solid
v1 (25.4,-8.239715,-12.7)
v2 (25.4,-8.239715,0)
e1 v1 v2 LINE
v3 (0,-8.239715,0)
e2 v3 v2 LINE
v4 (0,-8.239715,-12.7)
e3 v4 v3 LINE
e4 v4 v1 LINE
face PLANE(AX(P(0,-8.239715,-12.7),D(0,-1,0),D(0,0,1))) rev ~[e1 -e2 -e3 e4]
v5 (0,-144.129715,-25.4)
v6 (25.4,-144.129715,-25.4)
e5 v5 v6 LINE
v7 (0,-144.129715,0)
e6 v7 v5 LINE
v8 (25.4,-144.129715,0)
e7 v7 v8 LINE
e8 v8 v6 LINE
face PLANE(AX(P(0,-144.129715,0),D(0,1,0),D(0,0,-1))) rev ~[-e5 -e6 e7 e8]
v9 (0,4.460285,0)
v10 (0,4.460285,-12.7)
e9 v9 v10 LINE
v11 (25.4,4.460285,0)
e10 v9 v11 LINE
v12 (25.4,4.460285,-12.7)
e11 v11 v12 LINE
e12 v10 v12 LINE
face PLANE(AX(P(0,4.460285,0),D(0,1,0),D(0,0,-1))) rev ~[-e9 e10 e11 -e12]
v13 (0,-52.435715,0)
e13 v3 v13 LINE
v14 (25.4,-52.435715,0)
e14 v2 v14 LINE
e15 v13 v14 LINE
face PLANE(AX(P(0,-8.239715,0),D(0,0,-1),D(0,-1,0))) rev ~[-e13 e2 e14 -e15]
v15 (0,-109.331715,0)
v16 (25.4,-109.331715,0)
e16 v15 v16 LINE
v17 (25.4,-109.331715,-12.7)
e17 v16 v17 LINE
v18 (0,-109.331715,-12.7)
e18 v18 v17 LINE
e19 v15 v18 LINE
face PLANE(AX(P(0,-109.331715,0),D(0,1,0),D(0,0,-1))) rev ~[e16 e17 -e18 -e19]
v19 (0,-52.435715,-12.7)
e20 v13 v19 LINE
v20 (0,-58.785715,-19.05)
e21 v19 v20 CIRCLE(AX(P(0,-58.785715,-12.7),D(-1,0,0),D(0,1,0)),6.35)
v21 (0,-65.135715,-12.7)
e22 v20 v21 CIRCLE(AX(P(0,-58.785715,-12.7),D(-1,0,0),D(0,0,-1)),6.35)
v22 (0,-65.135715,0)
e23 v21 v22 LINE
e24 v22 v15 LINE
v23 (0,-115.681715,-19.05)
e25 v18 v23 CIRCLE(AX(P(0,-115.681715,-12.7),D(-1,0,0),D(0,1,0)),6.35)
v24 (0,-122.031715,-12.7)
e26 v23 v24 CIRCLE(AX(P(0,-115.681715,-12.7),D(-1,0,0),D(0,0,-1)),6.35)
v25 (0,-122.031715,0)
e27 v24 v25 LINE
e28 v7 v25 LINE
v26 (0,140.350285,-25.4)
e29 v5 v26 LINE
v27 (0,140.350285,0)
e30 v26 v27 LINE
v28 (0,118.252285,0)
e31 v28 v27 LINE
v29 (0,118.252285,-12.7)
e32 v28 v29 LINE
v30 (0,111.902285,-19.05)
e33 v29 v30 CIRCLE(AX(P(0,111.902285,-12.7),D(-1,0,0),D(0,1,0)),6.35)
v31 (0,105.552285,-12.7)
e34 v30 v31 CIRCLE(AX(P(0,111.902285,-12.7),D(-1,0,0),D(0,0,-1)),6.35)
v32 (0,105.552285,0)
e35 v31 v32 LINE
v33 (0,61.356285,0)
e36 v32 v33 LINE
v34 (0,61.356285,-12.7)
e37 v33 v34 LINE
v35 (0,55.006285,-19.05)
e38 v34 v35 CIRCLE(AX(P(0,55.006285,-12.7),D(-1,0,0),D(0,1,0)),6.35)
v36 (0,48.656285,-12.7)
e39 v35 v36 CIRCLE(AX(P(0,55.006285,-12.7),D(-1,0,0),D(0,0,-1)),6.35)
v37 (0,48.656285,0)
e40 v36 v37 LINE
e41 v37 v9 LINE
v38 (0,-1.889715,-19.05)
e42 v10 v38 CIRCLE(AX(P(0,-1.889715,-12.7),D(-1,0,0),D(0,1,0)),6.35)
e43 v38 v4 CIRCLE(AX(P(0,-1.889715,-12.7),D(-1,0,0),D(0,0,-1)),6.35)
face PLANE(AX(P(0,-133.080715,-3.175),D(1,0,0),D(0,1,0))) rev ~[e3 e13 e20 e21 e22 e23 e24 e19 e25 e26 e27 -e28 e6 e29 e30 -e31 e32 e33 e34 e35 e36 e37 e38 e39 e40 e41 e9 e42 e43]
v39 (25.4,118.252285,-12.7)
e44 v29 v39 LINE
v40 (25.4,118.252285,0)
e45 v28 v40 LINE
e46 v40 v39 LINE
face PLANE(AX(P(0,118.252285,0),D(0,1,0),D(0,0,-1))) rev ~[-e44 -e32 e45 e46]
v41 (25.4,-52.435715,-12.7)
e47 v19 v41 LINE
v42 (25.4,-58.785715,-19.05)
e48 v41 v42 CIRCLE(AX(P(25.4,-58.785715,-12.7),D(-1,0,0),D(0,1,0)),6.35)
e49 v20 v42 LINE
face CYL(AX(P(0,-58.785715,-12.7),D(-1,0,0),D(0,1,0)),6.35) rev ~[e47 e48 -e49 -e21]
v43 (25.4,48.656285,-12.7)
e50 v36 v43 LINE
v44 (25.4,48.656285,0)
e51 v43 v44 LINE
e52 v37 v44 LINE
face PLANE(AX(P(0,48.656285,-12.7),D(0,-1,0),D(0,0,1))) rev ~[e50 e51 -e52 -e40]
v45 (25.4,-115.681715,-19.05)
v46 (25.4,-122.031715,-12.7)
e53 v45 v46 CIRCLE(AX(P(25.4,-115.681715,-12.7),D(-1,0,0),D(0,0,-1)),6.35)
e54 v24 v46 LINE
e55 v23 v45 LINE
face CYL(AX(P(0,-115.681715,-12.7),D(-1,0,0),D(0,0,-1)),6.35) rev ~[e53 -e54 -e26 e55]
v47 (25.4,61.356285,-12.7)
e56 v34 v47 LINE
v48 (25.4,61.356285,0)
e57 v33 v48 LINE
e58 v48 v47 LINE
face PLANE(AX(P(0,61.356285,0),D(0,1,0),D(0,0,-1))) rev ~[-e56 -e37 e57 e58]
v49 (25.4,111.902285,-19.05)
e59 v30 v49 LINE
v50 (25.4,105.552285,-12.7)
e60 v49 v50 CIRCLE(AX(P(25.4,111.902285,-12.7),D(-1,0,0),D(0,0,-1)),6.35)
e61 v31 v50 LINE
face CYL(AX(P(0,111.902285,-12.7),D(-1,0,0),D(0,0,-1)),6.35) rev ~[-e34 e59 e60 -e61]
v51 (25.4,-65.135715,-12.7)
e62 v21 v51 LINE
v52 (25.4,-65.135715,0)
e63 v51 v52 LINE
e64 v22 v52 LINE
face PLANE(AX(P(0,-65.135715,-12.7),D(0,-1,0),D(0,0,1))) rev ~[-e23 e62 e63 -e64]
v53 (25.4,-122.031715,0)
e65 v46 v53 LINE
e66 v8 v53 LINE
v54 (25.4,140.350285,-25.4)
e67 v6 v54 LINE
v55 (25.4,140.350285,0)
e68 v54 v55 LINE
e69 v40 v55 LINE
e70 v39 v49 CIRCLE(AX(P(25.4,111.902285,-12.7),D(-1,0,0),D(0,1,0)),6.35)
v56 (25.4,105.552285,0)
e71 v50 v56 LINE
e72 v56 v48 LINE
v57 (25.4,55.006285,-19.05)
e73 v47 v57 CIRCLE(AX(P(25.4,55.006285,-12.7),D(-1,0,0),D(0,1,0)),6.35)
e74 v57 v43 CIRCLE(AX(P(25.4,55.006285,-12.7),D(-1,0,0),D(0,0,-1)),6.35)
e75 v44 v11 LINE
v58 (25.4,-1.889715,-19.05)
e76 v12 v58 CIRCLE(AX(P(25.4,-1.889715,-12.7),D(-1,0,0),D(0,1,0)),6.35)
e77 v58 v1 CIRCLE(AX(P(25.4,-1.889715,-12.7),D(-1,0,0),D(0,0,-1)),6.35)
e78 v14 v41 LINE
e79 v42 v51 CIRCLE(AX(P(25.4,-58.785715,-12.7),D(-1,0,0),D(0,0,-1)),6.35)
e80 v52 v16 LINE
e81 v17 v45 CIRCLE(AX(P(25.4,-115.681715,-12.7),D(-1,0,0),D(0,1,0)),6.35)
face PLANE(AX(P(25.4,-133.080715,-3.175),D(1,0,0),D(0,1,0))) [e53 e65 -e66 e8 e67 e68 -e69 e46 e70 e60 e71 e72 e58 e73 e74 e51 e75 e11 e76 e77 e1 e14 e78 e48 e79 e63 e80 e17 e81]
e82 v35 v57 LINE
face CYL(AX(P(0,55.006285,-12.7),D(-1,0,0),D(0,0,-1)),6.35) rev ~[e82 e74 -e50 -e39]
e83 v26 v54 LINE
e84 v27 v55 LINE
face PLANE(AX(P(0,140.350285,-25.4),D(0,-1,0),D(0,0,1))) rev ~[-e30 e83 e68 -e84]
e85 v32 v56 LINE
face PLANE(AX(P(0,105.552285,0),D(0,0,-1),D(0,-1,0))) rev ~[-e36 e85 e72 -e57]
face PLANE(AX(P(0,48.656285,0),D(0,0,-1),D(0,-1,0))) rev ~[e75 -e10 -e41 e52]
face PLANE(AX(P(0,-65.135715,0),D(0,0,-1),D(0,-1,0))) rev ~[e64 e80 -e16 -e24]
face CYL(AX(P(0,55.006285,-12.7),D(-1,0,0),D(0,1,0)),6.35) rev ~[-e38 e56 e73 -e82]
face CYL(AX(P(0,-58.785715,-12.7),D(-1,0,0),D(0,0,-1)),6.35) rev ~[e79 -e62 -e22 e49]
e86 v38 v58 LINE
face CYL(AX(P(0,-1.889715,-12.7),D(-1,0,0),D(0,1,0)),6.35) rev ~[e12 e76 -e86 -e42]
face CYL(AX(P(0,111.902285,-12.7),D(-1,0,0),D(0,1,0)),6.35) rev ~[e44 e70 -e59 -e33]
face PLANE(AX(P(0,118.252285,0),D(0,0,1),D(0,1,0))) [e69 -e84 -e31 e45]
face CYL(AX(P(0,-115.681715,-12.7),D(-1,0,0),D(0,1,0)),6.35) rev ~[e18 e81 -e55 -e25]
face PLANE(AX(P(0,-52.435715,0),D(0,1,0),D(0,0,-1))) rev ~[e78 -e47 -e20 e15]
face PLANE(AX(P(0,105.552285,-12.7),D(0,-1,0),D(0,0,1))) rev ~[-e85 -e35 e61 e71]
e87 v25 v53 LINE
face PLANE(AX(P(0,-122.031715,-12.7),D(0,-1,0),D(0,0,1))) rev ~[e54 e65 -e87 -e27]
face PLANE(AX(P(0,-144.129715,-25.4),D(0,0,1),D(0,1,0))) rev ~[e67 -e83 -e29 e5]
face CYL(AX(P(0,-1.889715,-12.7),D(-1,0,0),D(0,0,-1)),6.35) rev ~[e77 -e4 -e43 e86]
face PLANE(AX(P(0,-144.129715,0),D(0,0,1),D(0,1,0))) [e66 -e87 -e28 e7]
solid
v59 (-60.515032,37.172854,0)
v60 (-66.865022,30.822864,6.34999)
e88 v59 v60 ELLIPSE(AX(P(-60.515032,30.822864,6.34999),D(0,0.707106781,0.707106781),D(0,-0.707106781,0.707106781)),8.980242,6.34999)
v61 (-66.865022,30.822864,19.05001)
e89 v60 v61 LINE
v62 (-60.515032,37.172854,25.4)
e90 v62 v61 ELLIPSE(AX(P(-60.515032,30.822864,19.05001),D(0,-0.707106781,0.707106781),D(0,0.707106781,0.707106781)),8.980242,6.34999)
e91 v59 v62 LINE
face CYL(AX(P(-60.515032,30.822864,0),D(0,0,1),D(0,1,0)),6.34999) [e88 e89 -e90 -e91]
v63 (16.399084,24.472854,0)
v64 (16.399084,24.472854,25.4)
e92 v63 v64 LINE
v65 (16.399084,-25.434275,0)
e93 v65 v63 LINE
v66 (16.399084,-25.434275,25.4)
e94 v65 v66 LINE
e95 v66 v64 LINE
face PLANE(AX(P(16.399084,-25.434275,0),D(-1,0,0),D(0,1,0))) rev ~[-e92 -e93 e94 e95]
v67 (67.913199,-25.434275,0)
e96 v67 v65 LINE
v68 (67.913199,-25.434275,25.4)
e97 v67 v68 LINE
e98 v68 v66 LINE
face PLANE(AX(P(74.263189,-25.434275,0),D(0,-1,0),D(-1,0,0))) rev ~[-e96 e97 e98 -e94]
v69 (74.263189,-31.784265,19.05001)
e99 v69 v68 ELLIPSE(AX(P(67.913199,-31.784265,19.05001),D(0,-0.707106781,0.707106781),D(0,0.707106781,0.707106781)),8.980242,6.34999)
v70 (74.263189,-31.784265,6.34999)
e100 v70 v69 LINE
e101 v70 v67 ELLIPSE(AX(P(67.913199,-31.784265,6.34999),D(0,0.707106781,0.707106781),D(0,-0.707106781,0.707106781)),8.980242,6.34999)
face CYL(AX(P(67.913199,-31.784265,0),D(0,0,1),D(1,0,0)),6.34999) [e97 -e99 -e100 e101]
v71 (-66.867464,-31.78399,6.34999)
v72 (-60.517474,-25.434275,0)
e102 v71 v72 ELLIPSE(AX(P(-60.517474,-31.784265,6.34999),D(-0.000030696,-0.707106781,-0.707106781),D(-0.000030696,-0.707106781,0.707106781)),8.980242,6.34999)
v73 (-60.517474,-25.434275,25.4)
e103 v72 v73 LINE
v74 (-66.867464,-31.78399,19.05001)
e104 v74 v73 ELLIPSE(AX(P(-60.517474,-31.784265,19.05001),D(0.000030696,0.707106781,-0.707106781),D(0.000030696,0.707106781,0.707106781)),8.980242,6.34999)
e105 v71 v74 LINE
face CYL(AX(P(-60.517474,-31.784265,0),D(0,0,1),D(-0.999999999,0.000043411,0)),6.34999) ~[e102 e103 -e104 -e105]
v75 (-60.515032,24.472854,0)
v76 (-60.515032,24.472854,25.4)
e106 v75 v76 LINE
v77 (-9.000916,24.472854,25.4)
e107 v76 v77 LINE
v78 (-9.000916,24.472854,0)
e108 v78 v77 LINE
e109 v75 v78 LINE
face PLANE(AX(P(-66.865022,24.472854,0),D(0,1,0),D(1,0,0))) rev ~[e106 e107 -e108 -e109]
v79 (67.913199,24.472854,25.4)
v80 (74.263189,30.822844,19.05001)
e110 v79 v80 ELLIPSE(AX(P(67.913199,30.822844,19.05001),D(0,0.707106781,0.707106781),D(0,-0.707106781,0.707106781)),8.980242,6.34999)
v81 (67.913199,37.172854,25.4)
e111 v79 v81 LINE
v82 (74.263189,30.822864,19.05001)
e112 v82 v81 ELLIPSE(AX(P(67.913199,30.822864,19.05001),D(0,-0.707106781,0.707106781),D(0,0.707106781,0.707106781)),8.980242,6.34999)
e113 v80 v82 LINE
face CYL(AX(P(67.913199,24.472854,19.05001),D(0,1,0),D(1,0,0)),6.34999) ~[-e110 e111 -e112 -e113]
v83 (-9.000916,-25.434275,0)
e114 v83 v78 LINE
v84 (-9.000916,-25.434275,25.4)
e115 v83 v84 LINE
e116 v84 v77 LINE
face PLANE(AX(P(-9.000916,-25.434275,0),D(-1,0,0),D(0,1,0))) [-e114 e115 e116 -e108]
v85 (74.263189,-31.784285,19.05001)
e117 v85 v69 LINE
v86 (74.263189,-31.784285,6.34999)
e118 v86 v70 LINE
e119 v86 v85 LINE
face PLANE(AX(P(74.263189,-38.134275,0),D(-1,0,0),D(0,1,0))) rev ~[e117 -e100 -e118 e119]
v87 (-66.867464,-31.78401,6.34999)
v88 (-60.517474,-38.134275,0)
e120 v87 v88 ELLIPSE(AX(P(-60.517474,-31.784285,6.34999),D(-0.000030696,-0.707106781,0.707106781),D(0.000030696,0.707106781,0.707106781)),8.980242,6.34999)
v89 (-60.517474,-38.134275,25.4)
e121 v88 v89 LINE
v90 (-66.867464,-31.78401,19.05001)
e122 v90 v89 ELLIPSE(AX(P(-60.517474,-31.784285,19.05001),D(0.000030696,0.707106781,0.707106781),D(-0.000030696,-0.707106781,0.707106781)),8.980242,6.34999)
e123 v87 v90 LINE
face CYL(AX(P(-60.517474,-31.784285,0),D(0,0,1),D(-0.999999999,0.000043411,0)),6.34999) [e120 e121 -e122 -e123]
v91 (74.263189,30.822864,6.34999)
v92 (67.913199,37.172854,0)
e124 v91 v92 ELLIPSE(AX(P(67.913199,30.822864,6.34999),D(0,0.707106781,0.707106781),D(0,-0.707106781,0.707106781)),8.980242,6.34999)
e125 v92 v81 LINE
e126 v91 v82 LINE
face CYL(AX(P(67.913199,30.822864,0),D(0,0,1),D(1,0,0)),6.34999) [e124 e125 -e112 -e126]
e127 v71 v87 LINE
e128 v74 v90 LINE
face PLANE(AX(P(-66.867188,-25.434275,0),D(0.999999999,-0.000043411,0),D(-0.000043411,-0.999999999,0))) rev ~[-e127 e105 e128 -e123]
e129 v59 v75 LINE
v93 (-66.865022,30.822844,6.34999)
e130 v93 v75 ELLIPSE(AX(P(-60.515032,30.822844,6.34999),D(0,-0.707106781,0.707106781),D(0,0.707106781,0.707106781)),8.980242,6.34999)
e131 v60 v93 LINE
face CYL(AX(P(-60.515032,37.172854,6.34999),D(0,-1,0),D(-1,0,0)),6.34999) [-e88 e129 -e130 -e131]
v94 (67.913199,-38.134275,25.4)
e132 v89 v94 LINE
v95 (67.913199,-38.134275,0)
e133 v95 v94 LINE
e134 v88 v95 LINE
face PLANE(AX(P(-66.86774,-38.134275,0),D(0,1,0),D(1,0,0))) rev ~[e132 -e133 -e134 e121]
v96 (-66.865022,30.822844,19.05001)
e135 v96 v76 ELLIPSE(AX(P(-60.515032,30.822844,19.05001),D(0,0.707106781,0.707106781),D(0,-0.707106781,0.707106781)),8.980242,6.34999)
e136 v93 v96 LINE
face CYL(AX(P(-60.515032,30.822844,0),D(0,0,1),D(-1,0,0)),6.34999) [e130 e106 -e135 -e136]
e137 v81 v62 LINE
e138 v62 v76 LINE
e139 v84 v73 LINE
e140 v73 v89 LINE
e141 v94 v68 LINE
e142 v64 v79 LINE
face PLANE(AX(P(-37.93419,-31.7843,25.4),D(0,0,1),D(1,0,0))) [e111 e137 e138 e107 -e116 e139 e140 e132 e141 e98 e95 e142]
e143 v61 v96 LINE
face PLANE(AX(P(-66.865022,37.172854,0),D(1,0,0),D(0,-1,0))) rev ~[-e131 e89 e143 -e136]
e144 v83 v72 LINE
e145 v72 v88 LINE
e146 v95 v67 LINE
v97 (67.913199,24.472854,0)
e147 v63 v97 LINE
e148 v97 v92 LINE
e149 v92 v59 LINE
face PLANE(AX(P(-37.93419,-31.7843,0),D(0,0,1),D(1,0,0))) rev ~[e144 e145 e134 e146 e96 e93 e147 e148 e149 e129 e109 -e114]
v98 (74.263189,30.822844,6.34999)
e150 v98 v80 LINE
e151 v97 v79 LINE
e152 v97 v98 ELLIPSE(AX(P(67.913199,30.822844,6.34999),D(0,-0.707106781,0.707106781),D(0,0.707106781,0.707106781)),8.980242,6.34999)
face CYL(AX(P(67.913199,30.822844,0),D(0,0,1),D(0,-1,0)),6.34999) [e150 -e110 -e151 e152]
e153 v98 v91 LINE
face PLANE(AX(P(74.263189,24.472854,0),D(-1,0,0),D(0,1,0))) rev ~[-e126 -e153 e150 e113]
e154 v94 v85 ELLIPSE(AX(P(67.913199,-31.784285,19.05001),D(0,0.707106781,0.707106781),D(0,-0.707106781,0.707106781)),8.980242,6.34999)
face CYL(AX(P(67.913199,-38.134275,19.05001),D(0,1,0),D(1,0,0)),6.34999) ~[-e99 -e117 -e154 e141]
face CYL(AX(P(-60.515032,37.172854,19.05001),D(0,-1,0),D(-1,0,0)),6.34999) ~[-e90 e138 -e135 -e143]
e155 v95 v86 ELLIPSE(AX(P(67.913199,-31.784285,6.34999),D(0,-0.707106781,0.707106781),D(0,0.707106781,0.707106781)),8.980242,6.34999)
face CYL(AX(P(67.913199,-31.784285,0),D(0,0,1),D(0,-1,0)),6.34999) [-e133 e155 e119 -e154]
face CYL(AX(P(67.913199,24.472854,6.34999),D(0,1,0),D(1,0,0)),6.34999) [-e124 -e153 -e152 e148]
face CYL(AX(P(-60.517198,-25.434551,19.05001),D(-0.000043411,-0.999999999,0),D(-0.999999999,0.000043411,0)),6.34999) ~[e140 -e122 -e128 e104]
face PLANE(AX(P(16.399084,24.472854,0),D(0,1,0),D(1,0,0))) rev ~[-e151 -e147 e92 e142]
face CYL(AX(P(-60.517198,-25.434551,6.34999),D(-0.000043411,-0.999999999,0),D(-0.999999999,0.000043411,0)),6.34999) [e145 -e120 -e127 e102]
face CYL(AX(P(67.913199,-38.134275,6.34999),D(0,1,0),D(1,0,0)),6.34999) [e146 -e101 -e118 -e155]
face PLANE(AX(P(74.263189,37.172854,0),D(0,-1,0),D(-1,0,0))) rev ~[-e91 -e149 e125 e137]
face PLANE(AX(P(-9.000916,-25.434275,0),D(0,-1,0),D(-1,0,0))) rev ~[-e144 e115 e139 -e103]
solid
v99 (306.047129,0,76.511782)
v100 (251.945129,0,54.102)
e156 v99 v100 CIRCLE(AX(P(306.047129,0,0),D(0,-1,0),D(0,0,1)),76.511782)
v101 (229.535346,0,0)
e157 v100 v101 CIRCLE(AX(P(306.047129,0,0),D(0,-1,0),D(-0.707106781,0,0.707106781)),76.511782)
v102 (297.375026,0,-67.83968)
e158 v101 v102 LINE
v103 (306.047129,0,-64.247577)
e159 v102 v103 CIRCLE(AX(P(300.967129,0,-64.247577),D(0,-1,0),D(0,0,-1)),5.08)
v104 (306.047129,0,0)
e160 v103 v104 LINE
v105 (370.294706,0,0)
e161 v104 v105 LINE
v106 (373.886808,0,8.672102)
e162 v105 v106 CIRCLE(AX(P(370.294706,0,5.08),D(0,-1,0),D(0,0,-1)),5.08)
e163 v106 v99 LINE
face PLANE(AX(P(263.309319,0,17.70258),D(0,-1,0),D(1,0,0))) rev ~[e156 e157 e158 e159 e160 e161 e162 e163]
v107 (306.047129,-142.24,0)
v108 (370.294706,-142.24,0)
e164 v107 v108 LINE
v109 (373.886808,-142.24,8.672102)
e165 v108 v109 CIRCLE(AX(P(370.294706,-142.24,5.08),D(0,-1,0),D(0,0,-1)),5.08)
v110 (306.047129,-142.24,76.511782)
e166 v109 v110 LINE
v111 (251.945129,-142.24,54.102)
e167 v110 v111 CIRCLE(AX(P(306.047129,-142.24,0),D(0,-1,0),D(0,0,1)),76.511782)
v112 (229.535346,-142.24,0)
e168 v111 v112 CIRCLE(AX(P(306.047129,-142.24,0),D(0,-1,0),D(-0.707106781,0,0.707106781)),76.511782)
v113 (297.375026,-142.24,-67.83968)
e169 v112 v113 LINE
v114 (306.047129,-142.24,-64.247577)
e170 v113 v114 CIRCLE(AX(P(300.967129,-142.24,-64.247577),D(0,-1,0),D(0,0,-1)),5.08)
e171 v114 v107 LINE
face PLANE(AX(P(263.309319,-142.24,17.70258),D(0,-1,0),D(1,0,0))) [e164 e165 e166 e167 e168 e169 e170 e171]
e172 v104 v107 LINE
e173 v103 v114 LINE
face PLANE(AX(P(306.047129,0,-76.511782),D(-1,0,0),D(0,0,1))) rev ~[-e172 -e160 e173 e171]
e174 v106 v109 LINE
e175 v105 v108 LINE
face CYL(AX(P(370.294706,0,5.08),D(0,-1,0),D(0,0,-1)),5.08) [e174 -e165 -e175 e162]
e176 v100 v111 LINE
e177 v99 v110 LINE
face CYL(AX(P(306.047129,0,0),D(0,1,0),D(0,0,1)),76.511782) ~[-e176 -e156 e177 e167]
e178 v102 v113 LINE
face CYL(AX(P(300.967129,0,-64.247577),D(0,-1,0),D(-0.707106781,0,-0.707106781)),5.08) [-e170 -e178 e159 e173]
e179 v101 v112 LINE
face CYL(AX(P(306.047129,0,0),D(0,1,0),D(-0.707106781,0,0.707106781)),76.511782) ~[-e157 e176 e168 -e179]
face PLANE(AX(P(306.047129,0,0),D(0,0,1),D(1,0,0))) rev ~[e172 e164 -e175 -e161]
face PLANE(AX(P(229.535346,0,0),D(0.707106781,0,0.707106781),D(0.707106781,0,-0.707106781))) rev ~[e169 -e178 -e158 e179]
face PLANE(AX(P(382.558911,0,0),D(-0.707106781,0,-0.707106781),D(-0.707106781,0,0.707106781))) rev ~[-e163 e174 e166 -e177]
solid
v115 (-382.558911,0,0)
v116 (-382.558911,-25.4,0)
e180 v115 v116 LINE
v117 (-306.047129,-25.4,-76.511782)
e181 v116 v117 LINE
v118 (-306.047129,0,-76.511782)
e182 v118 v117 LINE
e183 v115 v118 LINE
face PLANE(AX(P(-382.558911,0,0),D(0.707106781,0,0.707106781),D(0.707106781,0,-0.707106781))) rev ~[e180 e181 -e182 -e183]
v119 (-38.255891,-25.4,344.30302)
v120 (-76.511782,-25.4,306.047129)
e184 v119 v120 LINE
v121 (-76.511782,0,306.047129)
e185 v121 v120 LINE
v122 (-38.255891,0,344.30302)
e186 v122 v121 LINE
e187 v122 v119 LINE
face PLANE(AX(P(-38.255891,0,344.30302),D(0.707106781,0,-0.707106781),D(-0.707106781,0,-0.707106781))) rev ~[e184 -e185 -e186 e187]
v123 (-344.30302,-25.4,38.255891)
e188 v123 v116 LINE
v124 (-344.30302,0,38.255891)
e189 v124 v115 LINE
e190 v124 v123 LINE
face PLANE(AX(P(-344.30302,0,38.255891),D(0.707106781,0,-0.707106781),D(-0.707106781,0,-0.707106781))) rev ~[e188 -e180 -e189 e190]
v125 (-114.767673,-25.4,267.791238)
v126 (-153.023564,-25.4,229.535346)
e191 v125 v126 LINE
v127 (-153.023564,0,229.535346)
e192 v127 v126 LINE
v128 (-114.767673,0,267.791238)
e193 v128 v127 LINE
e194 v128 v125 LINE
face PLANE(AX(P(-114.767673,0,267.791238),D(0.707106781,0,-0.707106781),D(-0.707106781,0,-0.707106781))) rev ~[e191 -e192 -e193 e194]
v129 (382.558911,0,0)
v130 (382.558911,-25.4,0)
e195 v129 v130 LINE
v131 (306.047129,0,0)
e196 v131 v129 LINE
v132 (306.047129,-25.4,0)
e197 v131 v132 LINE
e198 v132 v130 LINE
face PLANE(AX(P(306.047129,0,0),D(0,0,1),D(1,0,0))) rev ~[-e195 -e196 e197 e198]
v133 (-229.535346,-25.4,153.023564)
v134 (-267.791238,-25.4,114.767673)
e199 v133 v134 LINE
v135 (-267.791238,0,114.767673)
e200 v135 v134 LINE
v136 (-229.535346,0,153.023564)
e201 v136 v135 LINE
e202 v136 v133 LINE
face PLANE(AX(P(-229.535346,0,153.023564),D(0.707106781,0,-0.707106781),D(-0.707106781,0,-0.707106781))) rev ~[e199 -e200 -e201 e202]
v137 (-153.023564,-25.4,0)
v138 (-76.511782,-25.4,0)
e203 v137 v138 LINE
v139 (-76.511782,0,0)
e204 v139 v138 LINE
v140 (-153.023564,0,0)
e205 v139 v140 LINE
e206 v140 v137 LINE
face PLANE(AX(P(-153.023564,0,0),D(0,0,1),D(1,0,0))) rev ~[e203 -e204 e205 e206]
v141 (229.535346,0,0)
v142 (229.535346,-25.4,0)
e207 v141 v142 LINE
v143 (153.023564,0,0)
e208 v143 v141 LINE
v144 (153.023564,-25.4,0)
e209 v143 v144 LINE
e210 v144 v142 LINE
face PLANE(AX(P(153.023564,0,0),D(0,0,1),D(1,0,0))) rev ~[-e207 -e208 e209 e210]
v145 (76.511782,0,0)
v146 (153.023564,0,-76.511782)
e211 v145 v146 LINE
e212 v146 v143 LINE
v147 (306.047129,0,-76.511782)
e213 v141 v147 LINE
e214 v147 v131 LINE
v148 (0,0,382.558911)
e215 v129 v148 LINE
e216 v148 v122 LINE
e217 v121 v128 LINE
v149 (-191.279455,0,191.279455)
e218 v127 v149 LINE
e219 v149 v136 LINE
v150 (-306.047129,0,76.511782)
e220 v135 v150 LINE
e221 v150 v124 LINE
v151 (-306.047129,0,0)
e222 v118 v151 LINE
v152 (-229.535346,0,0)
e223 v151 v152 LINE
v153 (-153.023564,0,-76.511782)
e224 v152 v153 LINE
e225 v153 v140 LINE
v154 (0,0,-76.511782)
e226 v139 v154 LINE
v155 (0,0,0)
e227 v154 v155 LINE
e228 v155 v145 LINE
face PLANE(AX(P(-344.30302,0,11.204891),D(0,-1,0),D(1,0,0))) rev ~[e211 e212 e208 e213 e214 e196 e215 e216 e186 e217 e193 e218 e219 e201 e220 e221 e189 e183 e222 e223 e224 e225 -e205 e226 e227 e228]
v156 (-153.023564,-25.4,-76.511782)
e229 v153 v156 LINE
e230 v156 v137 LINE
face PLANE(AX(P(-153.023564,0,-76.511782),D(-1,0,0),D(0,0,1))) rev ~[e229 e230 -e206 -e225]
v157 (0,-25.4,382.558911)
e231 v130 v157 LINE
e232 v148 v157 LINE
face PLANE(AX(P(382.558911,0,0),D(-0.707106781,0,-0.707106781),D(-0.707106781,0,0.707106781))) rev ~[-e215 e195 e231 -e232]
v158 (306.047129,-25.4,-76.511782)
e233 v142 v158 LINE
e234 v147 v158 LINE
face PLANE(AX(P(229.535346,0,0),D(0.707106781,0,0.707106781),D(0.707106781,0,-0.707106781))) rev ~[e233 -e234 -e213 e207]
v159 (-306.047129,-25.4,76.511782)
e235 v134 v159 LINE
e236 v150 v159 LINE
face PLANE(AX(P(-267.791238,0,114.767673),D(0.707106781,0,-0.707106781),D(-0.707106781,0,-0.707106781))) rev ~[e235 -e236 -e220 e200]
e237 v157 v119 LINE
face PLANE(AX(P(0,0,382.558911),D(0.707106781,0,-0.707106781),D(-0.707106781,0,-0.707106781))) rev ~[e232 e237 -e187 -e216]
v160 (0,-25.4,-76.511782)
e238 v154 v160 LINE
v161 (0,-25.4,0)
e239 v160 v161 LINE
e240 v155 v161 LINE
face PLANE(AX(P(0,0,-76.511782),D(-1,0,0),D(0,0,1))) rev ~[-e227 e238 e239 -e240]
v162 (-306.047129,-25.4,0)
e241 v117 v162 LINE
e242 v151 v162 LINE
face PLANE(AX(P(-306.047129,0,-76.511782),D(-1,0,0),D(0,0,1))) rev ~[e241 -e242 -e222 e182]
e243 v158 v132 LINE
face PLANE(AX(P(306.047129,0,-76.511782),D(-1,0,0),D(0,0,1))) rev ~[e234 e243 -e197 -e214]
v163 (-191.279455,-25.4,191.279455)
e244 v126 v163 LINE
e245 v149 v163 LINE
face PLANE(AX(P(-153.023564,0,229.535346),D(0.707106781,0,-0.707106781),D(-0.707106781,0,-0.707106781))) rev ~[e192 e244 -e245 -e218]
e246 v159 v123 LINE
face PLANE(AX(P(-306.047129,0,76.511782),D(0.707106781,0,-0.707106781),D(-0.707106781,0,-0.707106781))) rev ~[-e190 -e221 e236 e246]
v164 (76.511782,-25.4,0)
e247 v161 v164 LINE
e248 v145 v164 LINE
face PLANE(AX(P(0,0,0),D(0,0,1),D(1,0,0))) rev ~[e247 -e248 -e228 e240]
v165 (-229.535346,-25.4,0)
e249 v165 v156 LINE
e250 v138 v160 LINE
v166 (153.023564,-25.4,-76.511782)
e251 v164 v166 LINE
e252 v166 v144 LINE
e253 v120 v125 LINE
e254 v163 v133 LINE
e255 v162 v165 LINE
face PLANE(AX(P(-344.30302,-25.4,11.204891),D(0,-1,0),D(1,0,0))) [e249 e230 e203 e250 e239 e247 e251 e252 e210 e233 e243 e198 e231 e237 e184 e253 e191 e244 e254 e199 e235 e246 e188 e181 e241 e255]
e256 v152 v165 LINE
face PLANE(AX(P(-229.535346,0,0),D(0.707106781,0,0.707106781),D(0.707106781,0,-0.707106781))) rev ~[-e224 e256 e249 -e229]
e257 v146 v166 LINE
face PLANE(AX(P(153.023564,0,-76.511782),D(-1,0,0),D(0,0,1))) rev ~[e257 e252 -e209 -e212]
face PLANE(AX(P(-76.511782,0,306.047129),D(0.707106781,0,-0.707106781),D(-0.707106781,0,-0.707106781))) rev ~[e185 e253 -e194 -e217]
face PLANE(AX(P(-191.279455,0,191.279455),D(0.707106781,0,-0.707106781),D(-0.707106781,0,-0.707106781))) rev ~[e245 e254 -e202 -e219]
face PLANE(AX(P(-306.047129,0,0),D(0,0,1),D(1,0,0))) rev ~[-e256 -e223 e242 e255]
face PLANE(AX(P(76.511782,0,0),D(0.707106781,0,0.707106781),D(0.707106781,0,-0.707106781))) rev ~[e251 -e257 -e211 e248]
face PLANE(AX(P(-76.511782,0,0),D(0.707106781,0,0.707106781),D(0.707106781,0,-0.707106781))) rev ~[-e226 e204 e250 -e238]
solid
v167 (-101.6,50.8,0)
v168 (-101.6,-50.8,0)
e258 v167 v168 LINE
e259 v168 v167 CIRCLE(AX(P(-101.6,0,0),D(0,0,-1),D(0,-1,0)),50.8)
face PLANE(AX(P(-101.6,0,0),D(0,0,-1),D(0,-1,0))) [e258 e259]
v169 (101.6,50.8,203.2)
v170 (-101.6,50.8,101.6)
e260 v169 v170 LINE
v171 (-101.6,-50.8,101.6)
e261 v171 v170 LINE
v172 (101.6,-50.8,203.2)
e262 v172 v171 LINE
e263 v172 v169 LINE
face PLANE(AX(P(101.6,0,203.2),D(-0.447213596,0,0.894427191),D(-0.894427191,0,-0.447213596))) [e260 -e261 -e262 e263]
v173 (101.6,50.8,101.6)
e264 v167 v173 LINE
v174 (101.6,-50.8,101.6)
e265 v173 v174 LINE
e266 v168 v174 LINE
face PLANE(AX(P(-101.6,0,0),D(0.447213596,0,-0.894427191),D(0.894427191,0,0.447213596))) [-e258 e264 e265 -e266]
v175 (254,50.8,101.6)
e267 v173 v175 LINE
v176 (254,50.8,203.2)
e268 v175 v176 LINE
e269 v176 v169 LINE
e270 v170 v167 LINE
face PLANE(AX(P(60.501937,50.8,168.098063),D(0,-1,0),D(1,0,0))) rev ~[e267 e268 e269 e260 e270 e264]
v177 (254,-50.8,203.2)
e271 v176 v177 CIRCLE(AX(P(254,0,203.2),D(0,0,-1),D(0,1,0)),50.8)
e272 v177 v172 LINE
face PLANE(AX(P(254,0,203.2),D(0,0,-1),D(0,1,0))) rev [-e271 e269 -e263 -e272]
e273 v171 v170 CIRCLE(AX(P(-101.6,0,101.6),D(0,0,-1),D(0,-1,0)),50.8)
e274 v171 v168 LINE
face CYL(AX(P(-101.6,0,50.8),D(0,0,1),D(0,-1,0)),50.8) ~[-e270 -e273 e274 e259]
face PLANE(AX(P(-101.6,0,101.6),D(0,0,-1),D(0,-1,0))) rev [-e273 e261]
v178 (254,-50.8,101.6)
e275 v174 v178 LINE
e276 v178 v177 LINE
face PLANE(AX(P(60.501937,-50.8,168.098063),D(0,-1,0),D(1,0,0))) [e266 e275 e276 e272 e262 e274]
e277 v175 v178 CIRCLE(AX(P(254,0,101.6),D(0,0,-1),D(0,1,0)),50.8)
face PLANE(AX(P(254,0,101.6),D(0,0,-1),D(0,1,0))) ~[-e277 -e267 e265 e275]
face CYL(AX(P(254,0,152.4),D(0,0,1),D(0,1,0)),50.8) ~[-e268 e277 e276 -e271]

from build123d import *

# Parameters (mm, degrees)
F0_W          = 101.6
F0_H          = 50.8
F0_W_2        = 50.8
F0_H_2        = 101.6
F1_DEPTH      = 50.8
F2_ANGLE_BACK = 90
F2_ANGLE      = 180
F3_DEPTH      = 2.286
F0_W_3        = 43.6525400519
F4_ANGLE_BACK = 90
F4_ANGLE      = 180
F5_W          = 22.098
F5_H          = 6.35
F6_DEPTH      = 25.4
F7_W          = 57.8641055384
F7_H          = 12.7
F7_W_2        = 12.7
F7_H_2        = 49.9071290871
F8_DEPTH      = 25.4
F9_R          = 6.34999
F11_DEPTH     = 25.4
F12_DEPTH     = 142.24
F13_R         = 5.08


# Not quite as in the source:
# - a fillet or chamfer is up to 0.001 mm smaller than in the source, because OpenCascade refuses the exact size


with BuildPart() as f1:
    # F0 (on Front) → F1 (new body, symmetric)
    with BuildSketch(Plane.XZ):
        Polygon((101.6, 203.2), (0, 152.4), (101.6, 152.4), align=None)
        with Locations((50.8, 127)):
            Rectangle(F0_W, F0_H)
        Polygon((0, 152.4), (-101.6, 101.6), (0, 101.6), align=None)
        with Locations((-50.8, 76.2)):
            Rectangle(F0_W, F0_H)
        Polygon((0, 101.6), (0, 50.8), (101.6, 101.6), align=None)
        Polygon((-101.6, 50.8), (-101.6, 0), (0, 50.8), align=None)
        Polygon((101.6, 152.4), (101.6, 101.6), (152.4, 101.6), (152.4, 203.2), (101.6, 203.2), align=None)
        with Locations((177.8, 152.4)):
            Rectangle(F0_W_2, F0_H_2)
        with Locations((228.6, 152.4)):
            Rectangle(F0_W_2, F0_H_2)
    extrude(amount=F1_DEPTH, both=True)

    # F0 (on Front) → F2 (revolve)
    with BuildSketch(Plane.XZ, mode=Mode.PRIVATE) as f2_sk:
        with Locations((279.4, 152.4)):
            Rectangle(F0_W_2, F0_H_2)
    revolve(f2_sk.sketch.rotate(Axis((254, 0, 152.4), (0, 0, -1)), -F2_ANGLE_BACK), axis=Axis((254, 0, 152.4), (0, 0, -1)), revolution_arc=F2_ANGLE)

    # F0 (on Front) → F4 (revolve)
    with BuildSketch(Plane.XZ, mode=Mode.PRIVATE) as f4_sk:
        with Locations((-130.573729974, 50.8)):
            Rectangle(F0_W_3, F0_H_2)
        Polygon((-108.7474599481, 0), (-101.6, 0), (-101.6, 50.8), (-101.6, 101.6), (-108.7474599481, 101.6), align=None)
    revolve(f4_sk.sketch.rotate(Axis((-101.6, 0, 50.8), (0, 0, -1)), -F4_ANGLE_BACK), axis=Axis((-101.6, 0, 50.8), (0, 0, -1)), revolution_arc=F4_ANGLE)


with BuildPart() as f3:
    # F0 (on Front) → F3 (new body)
    with BuildSketch(Plane.XZ):
        Polygon((-108.7474599481, 0), (-101.6, 0), (-101.6, 50.8), (-101.6, 101.6), (-108.7474599481, 101.6), align=None)
    extrude(amount=F3_DEPTH)

    # F10 (on Front) → F11 (join)
    with BuildSketch(Plane.XZ):
        Polygon((-344.3030196818, 38.2558910758), (-382.5589107575, 0), (-306.047128606, 0), align=None)
        Polygon((-306.047128606, 0), (-382.5589107575, 0), (-306.047128606, -76.5117821515), align=None)
        Polygon((-344.3030196818, 38.2558910758), (-306.047128606, 0), (-229.5353464545, 0), (-306.047128606, 76.5117821515), align=None)
        with BuildLine():
            ThreePointArc((-229.5353464545, 0), (-251.945128606, 54.102), (-306.047128606, 76.5117821515))
            Line((-306.047128606, 76.5117821515), (-229.5353464545, 0))
        make_face()
        with BuildLine():
            Line((-267.7912375303, 114.7676732273), (-306.047128606, 76.5117821515))
            ThreePointArc((-306.047128606, 76.5117821515), (-251.945128606, 54.102), (-229.5353464545, 0))
            ThreePointArc((-229.5353464545, 0), (-223.7112338288, 29.2797914101), (-207.125564303, 54.102))
            Line((-207.125564303, 54.102), (-267.7912375303, 114.7676732273))
        make_face()
        with BuildLine():
            ThreePointArc((-207.125564303, 54.102), (-223.7112338288, 29.2797914101), (-229.5353464545, 0))
            Line((-229.5353464545, 0), (-153.023564303, 0))
            Line((-153.023564303, 0), (-207.125564303, 54.102))
        make_face()
        Polygon((-153.023564303, 0), (-229.5353464545, 0), (-153.023564303, -76.5117821515), align=None)
        with BuildLine():
            Line((-229.5353464545, 153.023564303), (-267.7912375303, 114.7676732273))
            Line((-267.7912375303, 114.7676732273), (-207.125564303, 54.102))
            ThreePointArc((-207.125564303, 54.102), (-182.3033557131, 70.6876695257), (-153.023564303, 76.5117821515))
            Line((-153.023564303, 76.5117821515), (-229.5353464545, 153.023564303))
        make_face()
        with BuildLine():
            Line((-207.125564303, 54.102), (-153.023564303, 0))
            Line((-153.023564303, 0), (-76.5117821515, 0))
            Line((-76.5117821515, 0), (-153.023564303, 76.5117821515))
            ThreePointArc((-153.023564303, 76.5117821515), (-182.3033557131, 70.6876695257), (-207.125564303, 54.102))
        make_face()
        with BuildLine():
            Line((-191.2794553788, 191.2794553788), (-229.5353464545, 153.023564303))
            Line((-229.5353464545, 153.023564303), (-153.023564303, 76.5117821515))
            ThreePointArc((-153.023564303, 76.5117821515), (-98.921564303, 54.102), (-76.5117821515, 0))
            ThreePointArc((-76.5117821515, 0), (-70.6876695257, 29.2797914101), (-54.102, 54.102))
            Line((-54.102, 54.102), (-191.2794553788, 191.2794553788))
        make_face()
        Polygon((-38.2558910758, 38.2558910758), (-76.5117821515, 0), (0, 0), align=None)
        Polygon((0, 0), (-76.5117821515, 0), (0, -76.5117821515), align=None)
        with BuildLine():
            ThreePointArc((-54.102, 54.102), (-70.6876695257, 29.2797914101), (-76.5117821515, 0))
            Line((-76.5117821515, 0), (-38.2558910758, 38.2558910758))
            Line((-38.2558910758, 38.2558910758), (-54.102, 54.102))
        make_face()
        with BuildLine():
            Line((-153.023564303, 76.5117821515), (-76.5117821515, 0))
            ThreePointArc((-76.5117821515, 0), (-98.921564303, 54.102), (-153.023564303, 76.5117821515))
        make_face()
        with BuildLine():
            Line((-153.023564303, 229.5353464545), (-191.2794553788, 191.2794553788))
            Line((-191.2794553788, 191.2794553788), (-54.102, 54.102))
            ThreePointArc((-54.102, 54.102), (-29.2797914101, 70.6876695257), (0, 76.5117821515))
            Line((0, 76.5117821515), (-153.023564303, 229.5353464545))
        make_face()
        Polygon((-38.2558910758, 38.2558910758), (0, 0), (76.5117821515, 0), (0, 76.5117821515), align=None)
        with BuildLine():
            Line((-54.102, 54.102), (-38.2558910758, 38.2558910758))
            Line((-38.2558910758, 38.2558910758), (0, 76.5117821515))
            ThreePointArc((0, 76.5117821515), (-29.2797914101, 70.6876695257), (-54.102, 54.102))
        make_face()
        Polygon((-114.7676732273, 267.7912375303), (-153.023564303, 229.5353464545), (0, 76.5117821515), (38.2558910758, 114.7676732273), align=None)
        Polygon((114.7676732273, 38.2558910758), (76.5117821515, 0), (153.023564303, 0), align=None)
        Polygon((153.023564303, 0), (76.5117821515, 0), (153.023564303, -76.5117821515), align=None)
        with BuildLine():
            ThreePointArc((98.921564303, 54.102), (82.3358947773, 29.2797914101), (76.5117821515, 0))
            Line((76.5117821515, 0), (114.7676732273, 38.2558910758))
            Line((114.7676732273, 38.2558910758), (98.921564303, 54.102))
        make_face()
        with BuildLine():
            ThreePointArc((0, 76.5117821515), (54.102, 54.102), (76.5117821515, 0))
            ThreePointArc((76.5117821515, 0), (82.3358947773, 29.2797914101), (98.921564303, 54.102))
            Line((98.921564303, 54.102), (38.2558910758, 114.7676732273))
            Line((38.2558910758, 114.7676732273), (0, 76.5117821515))
        make_face()
        with BuildLine():
            Line((0, 76.5117821515), (76.5117821515, 0))
            ThreePointArc((76.5117821515, 0), (54.102, 54.102), (0, 76.5117821515))
        make_face()
        Polygon((-76.5117821515, 306.047128606), (-114.7676732273, 267.7912375303), (38.2558910758, 114.7676732273), (76.5117821515, 153.023564303), align=None)
        Polygon((114.7676732273, 38.2558910758), (153.023564303, 0), (229.5353464545, 0), (153.023564303, 76.5117821515), align=None)
        with BuildLine():
            Line((98.921564303, 54.102), (114.7676732273, 38.2558910758))
            Line((114.7676732273, 38.2558910758), (153.023564303, 76.5117821515))
            ThreePointArc((153.023564303, 76.5117821515), (123.7437728929, 70.6876695257), (98.921564303, 54.102))
        make_face()
        with BuildLine():
            Line((38.2558910758, 114.7676732273), (98.921564303, 54.102))
            ThreePointArc((98.921564303, 54.102), (123.7437728929, 70.6876695257), (153.023564303, 76.5117821515))
            Line((153.023564303, 76.5117821515), (76.5117821515, 153.023564303))
            Line((76.5117821515, 153.023564303), (38.2558910758, 114.7676732273))
        make_face()
        Polygon((-38.2558910758, 344.3030196818), (-76.5117821515, 306.047128606), (76.5117821515, 153.023564303), (114.7676732273, 191.2794553788), align=None)
        with BuildLine():
            ThreePointArc((251.945128606, 54.102), (235.3594590803, 29.2797914101), (229.5353464545, 0))
            Line((229.5353464545, 0), (306.047128606, 0))
            Line((306.047128606, 0), (251.945128606, 54.102))
        make_face()
        Polygon((306.047128606, 0), (229.5353464545, 0), (306.047128606, -76.5117821515), align=None)
        with BuildLine():
            ThreePointArc((153.023564303, 76.5117821515), (207.125564303, 54.102), (229.5353464545, 0))
            ThreePointArc((229.5353464545, 0), (235.3594590803, 29.2797914101), (251.945128606, 54.102))
            Line((251.945128606, 54.102), (191.2794553788, 114.7676732273))
            Line((191.2794553788, 114.7676732273), (153.023564303, 76.5117821515))
        make_face()
        with BuildLine():
            Line((153.023564303, 76.5117821515), (229.5353464545, 0))
            ThreePointArc((229.5353464545, 0), (207.125564303, 54.102), (153.023564303, 76.5117821515))
        make_face()
        Polygon((153.023564303, 153.023564303), (153.023564303, 76.5117821515), (191.2794553788, 114.7676732273), align=None)
        Polygon((76.5117821515, 153.023564303), (153.023564303, 76.5117821515), (153.023564303, 153.023564303), align=None)
        Polygon((114.7676732273, 191.2794553788), (76.5117821515, 153.023564303), (153.023564303, 153.023564303), align=None)
        Polygon((0, 382.5589107575), (-38.2558910758, 344.3030196818), (114.7676732273, 191.2794553788), (153.023564303, 229.5353464545), align=None)
        with BuildLine():
            Line((251.945128606, 54.102), (306.047128606, 0))
            Line((306.047128606, 0), (382.5589107575, 0))
            Line((382.5589107575, 0), (306.047128606, 76.5117821515))
            ThreePointArc((306.047128606, 76.5117821515), (276.7673371959, 70.6876695257), (251.945128606, 54.102))
        make_face()
        with BuildLine():
            Line((191.2794553788, 114.7676732273), (251.945128606, 54.102))
            ThreePointArc((251.945128606, 54.102), (276.7673371959, 70.6876695257), (306.047128606, 76.5117821515))
            Line((306.047128606, 76.5117821515), (229.5353464545, 153.023564303))
            Line((229.5353464545, 153.023564303), (191.2794553788, 114.7676732273))
        make_face()
        Polygon((153.023564303, 153.023564303), (191.2794553788, 114.7676732273), (229.5353464545, 153.023564303), align=None)
        Polygon((114.7676732273, 191.2794553788), (153.023564303, 153.023564303), (153.023564303, 229.5353464545), align=None)
        Polygon((153.023564303, 229.5353464545), (153.023564303, 153.023564303), (229.5353464545, 153.023564303), align=None)
    extrude(amount=F11_DEPTH)


with BuildPart() as f6:
    # F5 (on Right) → F6 (new body)
    with BuildSketch(Plane.YZ):
        with Locations((-133.0807154845, -3.175)):
            Rectangle(F5_W, F5_H)
        with Locations((129.3012845155, -3.175)):
            Rectangle(F5_W, F5_H)
        with Locations((-76.1847154845, -3.175)):
            Rectangle(F5_W, F5_H)
        with Locations((-41.3867154845, -3.175)):
            Rectangle(F5_W, F5_H)
        with Locations((-19.2887154845, -3.175)):
            Rectangle(F5_W, F5_H)
        with Locations((15.5092845155, -3.175)):
            Rectangle(F5_W, F5_H)
        with Locations((37.6072845155, -3.175)):
            Rectangle(F5_W, F5_H)
        with Locations((72.4052845155, -3.175)):
            Rectangle(F5_W, F5_H)
        with Locations((94.5032845155, -3.175)):
            Rectangle(F5_W, F5_H)
        with BuildLine():
            Line((-122.0317154845, -12.7), (-144.1297154845, -12.7))
            Line((-144.1297154845, -12.7), (-144.1297154845, -25.4))
            Line((-144.1297154845, -25.4), (-115.6817154845, -25.4))
            Line((-115.6817154845, -25.4), (-115.6817154845, -19.05))
            ThreePointArc((-115.6817154845, -19.05), (-120.171843545, -17.1901280605), (-122.0317154845, -12.7))
        make_face()
        with BuildLine():
            Line((111.9022845155, -19.05), (111.9022845155, -25.4))
            Line((111.9022845155, -25.4), (140.3502845155, -25.4))
            Line((140.3502845155, -25.4), (140.3502845155, -12.7))
            Line((140.3502845155, -12.7), (118.2522845155, -12.7))
            ThreePointArc((118.2522845155, -12.7), (116.3924125761, -17.1901280605), (111.9022845155, -19.05))
        make_face()
        with Locations((-133.0807154845, -9.525)):
            Rectangle(F5_W, F5_H)
        with BuildLine():
            Line((-87.2337154845, -12.7), (-109.3317154845, -12.7))
            ThreePointArc((-109.3317154845, -12.7), (-111.1915874239, -17.1901280605), (-115.6817154845, -19.05))
            Line((-115.6817154845, -19.05), (-115.6817154845, -25.4))
            Line((-115.6817154845, -25.4), (-87.2337154845, -25.4))
            Line((-87.2337154845, -25.4), (-87.2337154845, -12.7))
        make_face()
        with BuildLine():
            Line((-65.1357154845, -12.7), (-87.2337154845, -12.7))
            Line((-87.2337154845, -12.7), (-87.2337154845, -25.4))
            Line((-87.2337154845, -25.4), (-58.7857154845, -25.4))
            Line((-58.7857154845, -25.4), (-58.7857154845, -19.05))
            ThreePointArc((-58.7857154845, -19.05), (-63.275843545, -17.1901280605), (-65.1357154845, -12.7))
        make_face()
        with BuildLine():
            Line((-58.7857154845, -19.05), (-58.7857154845, -25.4))
            Line((-58.7857154845, -25.4), (-30.3377154845, -25.4))
            Line((-30.3377154845, -25.4), (-30.3377154845, -12.7))
            Line((-30.3377154845, -12.7), (-52.4357154845, -12.7))
            ThreePointArc((-52.4357154845, -12.7), (-54.2955874239, -17.1901280605), (-58.7857154845, -19.05))
        make_face()
        with BuildLine():
            Line((-30.3377154845, -12.7), (-30.3377154845, -25.4))
            Line((-30.3377154845, -25.4), (-1.8897154845, -25.4))
            Line((-1.8897154845, -25.4), (-1.8897154845, -19.05))
            ThreePointArc((-1.8897154845, -19.05), (-6.379843545, -17.1901280605), (-8.2397154845, -12.7))
            Line((-8.2397154845, -12.7), (-30.3377154845, -12.7))
        make_face()
        with BuildLine():
            Line((-1.8897154845, -19.05), (-1.8897154845, -25.4))
            Line((-1.8897154845, -25.4), (26.5582845155, -25.4))
            Line((26.5582845155, -25.4), (26.5582845155, -12.7))
            Line((26.5582845155, -12.7), (4.4602845155, -12.7))
            ThreePointArc((4.4602845155, -12.7), (2.6004125761, -17.1901280605), (-1.8897154845, -19.05))
        make_face()
        with BuildLine():
            Line((26.5582845155, -12.7), (26.5582845155, -25.4))
            Line((26.5582845155, -25.4), (55.0062845155, -25.4))
            Line((55.0062845155, -25.4), (55.0062845155, -19.05))
            ThreePointArc((55.0062845155, -19.05), (50.516156455, -17.1901280605), (48.6562845155, -12.7))
            Line((48.6562845155, -12.7), (26.5582845155, -12.7))
        make_face()
        with BuildLine():
            Line((55.0062845155, -19.05), (55.0062845155, -25.4))
            Line((55.0062845155, -25.4), (83.4542845155, -25.4))
            Line((83.4542845155, -25.4), (83.4542845155, -12.7))
            Line((83.4542845155, -12.7), (61.3562845155, -12.7))
            ThreePointArc((61.3562845155, -12.7), (59.4964125761, -17.1901280605), (55.0062845155, -19.05))
        make_face()
        with BuildLine():
            Line((83.4542845155, -12.7), (83.4542845155, -25.4))
            Line((83.4542845155, -25.4), (111.9022845155, -25.4))
            Line((111.9022845155, -25.4), (111.9022845155, -19.05))
            ThreePointArc((111.9022845155, -19.05), (107.412156455, -17.1901280605), (105.5522845155, -12.7))
            Line((105.5522845155, -12.7), (83.4542845155, -12.7))
        make_face()
        with Locations((-98.2827154845, -9.525)):
            Rectangle(F5_W, F5_H)
        with Locations((-98.2827154845, -3.175)):
            Rectangle(F5_W, F5_H)
        with Locations((-76.1847154845, -9.525)):
            Rectangle(F5_W, F5_H)
        with Locations((-41.3867154845, -9.525)):
            Rectangle(F5_W, F5_H)
        with Locations((-19.2887154845, -9.525)):
            Rectangle(F5_W, F5_H)
        with Locations((15.5092845155, -9.525)):
            Rectangle(F5_W, F5_H)
        with Locations((37.6072845155, -9.525)):
            Rectangle(F5_W, F5_H)
        with Locations((72.4052845155, -9.525)):
            Rectangle(F5_W, F5_H)
        with Locations((94.5032845155, -9.525)):
            Rectangle(F5_W, F5_H)
        with Locations((129.3012845155, -9.525)):
            Rectangle(F5_W, F5_H)
    extrude(amount=F6_DEPTH)


with BuildPart() as f8:
    # F7 (on Top) → F8 (new body)
    with BuildSketch(Plane.XY):
        Polygon((-9.0009163551, -25.4342753371), (-66.8671883946, -25.4342753371), (-66.8677397098, -38.1342753371), (-9.0009163551, -38.1342753371), align=None)
        with Locations((45.3311364141, -31.7842753371)):
            Rectangle(F7_W, F7_H)
        Polygon((3.6990836449, 37.1728537501), (-66.8650218935, 37.1728537501), (-66.8650218935, 24.4728537501), (-9.0009163551, 24.4728537501), (3.6990836449, 24.4728537501), align=None)
        Polygon((74.2631891833, 37.1728537501), (3.6990836449, 37.1728537501), (3.6990836449, 24.4728537501), (16.3990836449, 24.4728537501), (74.2631891833, 24.4728537501), align=None)
        with Locations((10.0490836449, -31.7842753371)):
            Rectangle(F7_W_2, F7_H)
        with Locations((-2.6509163551, -31.7842753371)):
            Rectangle(F7_W_2, F7_H)
        with Locations((-2.6509163551, -0.4807107935)):
            Rectangle(F7_W_2, F7_H_2)
        with Locations((10.0490836449, -0.4807107935)):
            Rectangle(F7_W_2, F7_H_2)
    extrude(amount=F8_DEPTH)

    # F9 (radius 6.35 in the source; OpenCascade refuses exactly that, so slightly less here)
    f9_edges = [f8.edges().sort_by_distance(p)[0] for p in [
        (-66.867188, -25.434275, 12.7),
        (-66.86774, -38.134275, 12.7),
        (-66.867464, -31.784275, 0),
        (-66.867464, -31.784275, 25.4),
        (-66.865022, 37.172854, 12.7),
        (-66.865022, 24.472854, 12.7),
        (-66.865022, 30.822854, 0),
        (-66.865022, 30.822854, 25.4),
        (74.263189, -38.134275, 12.7),
        (74.263189, -25.434275, 12.7),
        (74.263189, -31.784275, 0),
        (74.263189, -31.784275, 25.4),
        (74.263189, 24.472854, 12.7),
        (74.263189, 37.172854, 12.7),
        (74.263189, 30.822854, 0),
        (74.263189, 30.822854, 25.4),
    ]]
    fillet(f9_edges, radius=F9_R)


with BuildPart() as f12:
    # F10 (on Front) → F12 (new body)
    with BuildSketch(Plane.XZ):
        with BuildLine():
            ThreePointArc((251.945128606, 54.102), (235.3594590803, 29.2797914101), (229.5353464545, 0))
            Line((229.5353464545, 0), (306.047128606, 0))
            Line((306.047128606, 0), (251.945128606, 54.102))
        make_face()
        Polygon((306.047128606, 0), (229.5353464545, 0), (306.047128606, -76.5117821515), align=None)
        with BuildLine():
            Line((251.945128606, 54.102), (306.047128606, 0))
            Line((306.047128606, 0), (382.5589107575, 0))
            Line((382.5589107575, 0), (306.047128606, 76.5117821515))
            ThreePointArc((306.047128606, 76.5117821515), (276.7673371959, 70.6876695257), (251.945128606, 54.102))
        make_face()
    extrude(amount=F12_DEPTH)

    # F13
    f13_edges = [f12.edges().sort_by_distance(p)[0] for p in [
        (382.558911, -71.12, 0),
        (306.047129, -71.12, -76.511782),
    ]]
    fillet(f13_edges, radius=F13_R)


solid = Compound([f1.part, f3.part, f6.part, f8.part, f12.part])
